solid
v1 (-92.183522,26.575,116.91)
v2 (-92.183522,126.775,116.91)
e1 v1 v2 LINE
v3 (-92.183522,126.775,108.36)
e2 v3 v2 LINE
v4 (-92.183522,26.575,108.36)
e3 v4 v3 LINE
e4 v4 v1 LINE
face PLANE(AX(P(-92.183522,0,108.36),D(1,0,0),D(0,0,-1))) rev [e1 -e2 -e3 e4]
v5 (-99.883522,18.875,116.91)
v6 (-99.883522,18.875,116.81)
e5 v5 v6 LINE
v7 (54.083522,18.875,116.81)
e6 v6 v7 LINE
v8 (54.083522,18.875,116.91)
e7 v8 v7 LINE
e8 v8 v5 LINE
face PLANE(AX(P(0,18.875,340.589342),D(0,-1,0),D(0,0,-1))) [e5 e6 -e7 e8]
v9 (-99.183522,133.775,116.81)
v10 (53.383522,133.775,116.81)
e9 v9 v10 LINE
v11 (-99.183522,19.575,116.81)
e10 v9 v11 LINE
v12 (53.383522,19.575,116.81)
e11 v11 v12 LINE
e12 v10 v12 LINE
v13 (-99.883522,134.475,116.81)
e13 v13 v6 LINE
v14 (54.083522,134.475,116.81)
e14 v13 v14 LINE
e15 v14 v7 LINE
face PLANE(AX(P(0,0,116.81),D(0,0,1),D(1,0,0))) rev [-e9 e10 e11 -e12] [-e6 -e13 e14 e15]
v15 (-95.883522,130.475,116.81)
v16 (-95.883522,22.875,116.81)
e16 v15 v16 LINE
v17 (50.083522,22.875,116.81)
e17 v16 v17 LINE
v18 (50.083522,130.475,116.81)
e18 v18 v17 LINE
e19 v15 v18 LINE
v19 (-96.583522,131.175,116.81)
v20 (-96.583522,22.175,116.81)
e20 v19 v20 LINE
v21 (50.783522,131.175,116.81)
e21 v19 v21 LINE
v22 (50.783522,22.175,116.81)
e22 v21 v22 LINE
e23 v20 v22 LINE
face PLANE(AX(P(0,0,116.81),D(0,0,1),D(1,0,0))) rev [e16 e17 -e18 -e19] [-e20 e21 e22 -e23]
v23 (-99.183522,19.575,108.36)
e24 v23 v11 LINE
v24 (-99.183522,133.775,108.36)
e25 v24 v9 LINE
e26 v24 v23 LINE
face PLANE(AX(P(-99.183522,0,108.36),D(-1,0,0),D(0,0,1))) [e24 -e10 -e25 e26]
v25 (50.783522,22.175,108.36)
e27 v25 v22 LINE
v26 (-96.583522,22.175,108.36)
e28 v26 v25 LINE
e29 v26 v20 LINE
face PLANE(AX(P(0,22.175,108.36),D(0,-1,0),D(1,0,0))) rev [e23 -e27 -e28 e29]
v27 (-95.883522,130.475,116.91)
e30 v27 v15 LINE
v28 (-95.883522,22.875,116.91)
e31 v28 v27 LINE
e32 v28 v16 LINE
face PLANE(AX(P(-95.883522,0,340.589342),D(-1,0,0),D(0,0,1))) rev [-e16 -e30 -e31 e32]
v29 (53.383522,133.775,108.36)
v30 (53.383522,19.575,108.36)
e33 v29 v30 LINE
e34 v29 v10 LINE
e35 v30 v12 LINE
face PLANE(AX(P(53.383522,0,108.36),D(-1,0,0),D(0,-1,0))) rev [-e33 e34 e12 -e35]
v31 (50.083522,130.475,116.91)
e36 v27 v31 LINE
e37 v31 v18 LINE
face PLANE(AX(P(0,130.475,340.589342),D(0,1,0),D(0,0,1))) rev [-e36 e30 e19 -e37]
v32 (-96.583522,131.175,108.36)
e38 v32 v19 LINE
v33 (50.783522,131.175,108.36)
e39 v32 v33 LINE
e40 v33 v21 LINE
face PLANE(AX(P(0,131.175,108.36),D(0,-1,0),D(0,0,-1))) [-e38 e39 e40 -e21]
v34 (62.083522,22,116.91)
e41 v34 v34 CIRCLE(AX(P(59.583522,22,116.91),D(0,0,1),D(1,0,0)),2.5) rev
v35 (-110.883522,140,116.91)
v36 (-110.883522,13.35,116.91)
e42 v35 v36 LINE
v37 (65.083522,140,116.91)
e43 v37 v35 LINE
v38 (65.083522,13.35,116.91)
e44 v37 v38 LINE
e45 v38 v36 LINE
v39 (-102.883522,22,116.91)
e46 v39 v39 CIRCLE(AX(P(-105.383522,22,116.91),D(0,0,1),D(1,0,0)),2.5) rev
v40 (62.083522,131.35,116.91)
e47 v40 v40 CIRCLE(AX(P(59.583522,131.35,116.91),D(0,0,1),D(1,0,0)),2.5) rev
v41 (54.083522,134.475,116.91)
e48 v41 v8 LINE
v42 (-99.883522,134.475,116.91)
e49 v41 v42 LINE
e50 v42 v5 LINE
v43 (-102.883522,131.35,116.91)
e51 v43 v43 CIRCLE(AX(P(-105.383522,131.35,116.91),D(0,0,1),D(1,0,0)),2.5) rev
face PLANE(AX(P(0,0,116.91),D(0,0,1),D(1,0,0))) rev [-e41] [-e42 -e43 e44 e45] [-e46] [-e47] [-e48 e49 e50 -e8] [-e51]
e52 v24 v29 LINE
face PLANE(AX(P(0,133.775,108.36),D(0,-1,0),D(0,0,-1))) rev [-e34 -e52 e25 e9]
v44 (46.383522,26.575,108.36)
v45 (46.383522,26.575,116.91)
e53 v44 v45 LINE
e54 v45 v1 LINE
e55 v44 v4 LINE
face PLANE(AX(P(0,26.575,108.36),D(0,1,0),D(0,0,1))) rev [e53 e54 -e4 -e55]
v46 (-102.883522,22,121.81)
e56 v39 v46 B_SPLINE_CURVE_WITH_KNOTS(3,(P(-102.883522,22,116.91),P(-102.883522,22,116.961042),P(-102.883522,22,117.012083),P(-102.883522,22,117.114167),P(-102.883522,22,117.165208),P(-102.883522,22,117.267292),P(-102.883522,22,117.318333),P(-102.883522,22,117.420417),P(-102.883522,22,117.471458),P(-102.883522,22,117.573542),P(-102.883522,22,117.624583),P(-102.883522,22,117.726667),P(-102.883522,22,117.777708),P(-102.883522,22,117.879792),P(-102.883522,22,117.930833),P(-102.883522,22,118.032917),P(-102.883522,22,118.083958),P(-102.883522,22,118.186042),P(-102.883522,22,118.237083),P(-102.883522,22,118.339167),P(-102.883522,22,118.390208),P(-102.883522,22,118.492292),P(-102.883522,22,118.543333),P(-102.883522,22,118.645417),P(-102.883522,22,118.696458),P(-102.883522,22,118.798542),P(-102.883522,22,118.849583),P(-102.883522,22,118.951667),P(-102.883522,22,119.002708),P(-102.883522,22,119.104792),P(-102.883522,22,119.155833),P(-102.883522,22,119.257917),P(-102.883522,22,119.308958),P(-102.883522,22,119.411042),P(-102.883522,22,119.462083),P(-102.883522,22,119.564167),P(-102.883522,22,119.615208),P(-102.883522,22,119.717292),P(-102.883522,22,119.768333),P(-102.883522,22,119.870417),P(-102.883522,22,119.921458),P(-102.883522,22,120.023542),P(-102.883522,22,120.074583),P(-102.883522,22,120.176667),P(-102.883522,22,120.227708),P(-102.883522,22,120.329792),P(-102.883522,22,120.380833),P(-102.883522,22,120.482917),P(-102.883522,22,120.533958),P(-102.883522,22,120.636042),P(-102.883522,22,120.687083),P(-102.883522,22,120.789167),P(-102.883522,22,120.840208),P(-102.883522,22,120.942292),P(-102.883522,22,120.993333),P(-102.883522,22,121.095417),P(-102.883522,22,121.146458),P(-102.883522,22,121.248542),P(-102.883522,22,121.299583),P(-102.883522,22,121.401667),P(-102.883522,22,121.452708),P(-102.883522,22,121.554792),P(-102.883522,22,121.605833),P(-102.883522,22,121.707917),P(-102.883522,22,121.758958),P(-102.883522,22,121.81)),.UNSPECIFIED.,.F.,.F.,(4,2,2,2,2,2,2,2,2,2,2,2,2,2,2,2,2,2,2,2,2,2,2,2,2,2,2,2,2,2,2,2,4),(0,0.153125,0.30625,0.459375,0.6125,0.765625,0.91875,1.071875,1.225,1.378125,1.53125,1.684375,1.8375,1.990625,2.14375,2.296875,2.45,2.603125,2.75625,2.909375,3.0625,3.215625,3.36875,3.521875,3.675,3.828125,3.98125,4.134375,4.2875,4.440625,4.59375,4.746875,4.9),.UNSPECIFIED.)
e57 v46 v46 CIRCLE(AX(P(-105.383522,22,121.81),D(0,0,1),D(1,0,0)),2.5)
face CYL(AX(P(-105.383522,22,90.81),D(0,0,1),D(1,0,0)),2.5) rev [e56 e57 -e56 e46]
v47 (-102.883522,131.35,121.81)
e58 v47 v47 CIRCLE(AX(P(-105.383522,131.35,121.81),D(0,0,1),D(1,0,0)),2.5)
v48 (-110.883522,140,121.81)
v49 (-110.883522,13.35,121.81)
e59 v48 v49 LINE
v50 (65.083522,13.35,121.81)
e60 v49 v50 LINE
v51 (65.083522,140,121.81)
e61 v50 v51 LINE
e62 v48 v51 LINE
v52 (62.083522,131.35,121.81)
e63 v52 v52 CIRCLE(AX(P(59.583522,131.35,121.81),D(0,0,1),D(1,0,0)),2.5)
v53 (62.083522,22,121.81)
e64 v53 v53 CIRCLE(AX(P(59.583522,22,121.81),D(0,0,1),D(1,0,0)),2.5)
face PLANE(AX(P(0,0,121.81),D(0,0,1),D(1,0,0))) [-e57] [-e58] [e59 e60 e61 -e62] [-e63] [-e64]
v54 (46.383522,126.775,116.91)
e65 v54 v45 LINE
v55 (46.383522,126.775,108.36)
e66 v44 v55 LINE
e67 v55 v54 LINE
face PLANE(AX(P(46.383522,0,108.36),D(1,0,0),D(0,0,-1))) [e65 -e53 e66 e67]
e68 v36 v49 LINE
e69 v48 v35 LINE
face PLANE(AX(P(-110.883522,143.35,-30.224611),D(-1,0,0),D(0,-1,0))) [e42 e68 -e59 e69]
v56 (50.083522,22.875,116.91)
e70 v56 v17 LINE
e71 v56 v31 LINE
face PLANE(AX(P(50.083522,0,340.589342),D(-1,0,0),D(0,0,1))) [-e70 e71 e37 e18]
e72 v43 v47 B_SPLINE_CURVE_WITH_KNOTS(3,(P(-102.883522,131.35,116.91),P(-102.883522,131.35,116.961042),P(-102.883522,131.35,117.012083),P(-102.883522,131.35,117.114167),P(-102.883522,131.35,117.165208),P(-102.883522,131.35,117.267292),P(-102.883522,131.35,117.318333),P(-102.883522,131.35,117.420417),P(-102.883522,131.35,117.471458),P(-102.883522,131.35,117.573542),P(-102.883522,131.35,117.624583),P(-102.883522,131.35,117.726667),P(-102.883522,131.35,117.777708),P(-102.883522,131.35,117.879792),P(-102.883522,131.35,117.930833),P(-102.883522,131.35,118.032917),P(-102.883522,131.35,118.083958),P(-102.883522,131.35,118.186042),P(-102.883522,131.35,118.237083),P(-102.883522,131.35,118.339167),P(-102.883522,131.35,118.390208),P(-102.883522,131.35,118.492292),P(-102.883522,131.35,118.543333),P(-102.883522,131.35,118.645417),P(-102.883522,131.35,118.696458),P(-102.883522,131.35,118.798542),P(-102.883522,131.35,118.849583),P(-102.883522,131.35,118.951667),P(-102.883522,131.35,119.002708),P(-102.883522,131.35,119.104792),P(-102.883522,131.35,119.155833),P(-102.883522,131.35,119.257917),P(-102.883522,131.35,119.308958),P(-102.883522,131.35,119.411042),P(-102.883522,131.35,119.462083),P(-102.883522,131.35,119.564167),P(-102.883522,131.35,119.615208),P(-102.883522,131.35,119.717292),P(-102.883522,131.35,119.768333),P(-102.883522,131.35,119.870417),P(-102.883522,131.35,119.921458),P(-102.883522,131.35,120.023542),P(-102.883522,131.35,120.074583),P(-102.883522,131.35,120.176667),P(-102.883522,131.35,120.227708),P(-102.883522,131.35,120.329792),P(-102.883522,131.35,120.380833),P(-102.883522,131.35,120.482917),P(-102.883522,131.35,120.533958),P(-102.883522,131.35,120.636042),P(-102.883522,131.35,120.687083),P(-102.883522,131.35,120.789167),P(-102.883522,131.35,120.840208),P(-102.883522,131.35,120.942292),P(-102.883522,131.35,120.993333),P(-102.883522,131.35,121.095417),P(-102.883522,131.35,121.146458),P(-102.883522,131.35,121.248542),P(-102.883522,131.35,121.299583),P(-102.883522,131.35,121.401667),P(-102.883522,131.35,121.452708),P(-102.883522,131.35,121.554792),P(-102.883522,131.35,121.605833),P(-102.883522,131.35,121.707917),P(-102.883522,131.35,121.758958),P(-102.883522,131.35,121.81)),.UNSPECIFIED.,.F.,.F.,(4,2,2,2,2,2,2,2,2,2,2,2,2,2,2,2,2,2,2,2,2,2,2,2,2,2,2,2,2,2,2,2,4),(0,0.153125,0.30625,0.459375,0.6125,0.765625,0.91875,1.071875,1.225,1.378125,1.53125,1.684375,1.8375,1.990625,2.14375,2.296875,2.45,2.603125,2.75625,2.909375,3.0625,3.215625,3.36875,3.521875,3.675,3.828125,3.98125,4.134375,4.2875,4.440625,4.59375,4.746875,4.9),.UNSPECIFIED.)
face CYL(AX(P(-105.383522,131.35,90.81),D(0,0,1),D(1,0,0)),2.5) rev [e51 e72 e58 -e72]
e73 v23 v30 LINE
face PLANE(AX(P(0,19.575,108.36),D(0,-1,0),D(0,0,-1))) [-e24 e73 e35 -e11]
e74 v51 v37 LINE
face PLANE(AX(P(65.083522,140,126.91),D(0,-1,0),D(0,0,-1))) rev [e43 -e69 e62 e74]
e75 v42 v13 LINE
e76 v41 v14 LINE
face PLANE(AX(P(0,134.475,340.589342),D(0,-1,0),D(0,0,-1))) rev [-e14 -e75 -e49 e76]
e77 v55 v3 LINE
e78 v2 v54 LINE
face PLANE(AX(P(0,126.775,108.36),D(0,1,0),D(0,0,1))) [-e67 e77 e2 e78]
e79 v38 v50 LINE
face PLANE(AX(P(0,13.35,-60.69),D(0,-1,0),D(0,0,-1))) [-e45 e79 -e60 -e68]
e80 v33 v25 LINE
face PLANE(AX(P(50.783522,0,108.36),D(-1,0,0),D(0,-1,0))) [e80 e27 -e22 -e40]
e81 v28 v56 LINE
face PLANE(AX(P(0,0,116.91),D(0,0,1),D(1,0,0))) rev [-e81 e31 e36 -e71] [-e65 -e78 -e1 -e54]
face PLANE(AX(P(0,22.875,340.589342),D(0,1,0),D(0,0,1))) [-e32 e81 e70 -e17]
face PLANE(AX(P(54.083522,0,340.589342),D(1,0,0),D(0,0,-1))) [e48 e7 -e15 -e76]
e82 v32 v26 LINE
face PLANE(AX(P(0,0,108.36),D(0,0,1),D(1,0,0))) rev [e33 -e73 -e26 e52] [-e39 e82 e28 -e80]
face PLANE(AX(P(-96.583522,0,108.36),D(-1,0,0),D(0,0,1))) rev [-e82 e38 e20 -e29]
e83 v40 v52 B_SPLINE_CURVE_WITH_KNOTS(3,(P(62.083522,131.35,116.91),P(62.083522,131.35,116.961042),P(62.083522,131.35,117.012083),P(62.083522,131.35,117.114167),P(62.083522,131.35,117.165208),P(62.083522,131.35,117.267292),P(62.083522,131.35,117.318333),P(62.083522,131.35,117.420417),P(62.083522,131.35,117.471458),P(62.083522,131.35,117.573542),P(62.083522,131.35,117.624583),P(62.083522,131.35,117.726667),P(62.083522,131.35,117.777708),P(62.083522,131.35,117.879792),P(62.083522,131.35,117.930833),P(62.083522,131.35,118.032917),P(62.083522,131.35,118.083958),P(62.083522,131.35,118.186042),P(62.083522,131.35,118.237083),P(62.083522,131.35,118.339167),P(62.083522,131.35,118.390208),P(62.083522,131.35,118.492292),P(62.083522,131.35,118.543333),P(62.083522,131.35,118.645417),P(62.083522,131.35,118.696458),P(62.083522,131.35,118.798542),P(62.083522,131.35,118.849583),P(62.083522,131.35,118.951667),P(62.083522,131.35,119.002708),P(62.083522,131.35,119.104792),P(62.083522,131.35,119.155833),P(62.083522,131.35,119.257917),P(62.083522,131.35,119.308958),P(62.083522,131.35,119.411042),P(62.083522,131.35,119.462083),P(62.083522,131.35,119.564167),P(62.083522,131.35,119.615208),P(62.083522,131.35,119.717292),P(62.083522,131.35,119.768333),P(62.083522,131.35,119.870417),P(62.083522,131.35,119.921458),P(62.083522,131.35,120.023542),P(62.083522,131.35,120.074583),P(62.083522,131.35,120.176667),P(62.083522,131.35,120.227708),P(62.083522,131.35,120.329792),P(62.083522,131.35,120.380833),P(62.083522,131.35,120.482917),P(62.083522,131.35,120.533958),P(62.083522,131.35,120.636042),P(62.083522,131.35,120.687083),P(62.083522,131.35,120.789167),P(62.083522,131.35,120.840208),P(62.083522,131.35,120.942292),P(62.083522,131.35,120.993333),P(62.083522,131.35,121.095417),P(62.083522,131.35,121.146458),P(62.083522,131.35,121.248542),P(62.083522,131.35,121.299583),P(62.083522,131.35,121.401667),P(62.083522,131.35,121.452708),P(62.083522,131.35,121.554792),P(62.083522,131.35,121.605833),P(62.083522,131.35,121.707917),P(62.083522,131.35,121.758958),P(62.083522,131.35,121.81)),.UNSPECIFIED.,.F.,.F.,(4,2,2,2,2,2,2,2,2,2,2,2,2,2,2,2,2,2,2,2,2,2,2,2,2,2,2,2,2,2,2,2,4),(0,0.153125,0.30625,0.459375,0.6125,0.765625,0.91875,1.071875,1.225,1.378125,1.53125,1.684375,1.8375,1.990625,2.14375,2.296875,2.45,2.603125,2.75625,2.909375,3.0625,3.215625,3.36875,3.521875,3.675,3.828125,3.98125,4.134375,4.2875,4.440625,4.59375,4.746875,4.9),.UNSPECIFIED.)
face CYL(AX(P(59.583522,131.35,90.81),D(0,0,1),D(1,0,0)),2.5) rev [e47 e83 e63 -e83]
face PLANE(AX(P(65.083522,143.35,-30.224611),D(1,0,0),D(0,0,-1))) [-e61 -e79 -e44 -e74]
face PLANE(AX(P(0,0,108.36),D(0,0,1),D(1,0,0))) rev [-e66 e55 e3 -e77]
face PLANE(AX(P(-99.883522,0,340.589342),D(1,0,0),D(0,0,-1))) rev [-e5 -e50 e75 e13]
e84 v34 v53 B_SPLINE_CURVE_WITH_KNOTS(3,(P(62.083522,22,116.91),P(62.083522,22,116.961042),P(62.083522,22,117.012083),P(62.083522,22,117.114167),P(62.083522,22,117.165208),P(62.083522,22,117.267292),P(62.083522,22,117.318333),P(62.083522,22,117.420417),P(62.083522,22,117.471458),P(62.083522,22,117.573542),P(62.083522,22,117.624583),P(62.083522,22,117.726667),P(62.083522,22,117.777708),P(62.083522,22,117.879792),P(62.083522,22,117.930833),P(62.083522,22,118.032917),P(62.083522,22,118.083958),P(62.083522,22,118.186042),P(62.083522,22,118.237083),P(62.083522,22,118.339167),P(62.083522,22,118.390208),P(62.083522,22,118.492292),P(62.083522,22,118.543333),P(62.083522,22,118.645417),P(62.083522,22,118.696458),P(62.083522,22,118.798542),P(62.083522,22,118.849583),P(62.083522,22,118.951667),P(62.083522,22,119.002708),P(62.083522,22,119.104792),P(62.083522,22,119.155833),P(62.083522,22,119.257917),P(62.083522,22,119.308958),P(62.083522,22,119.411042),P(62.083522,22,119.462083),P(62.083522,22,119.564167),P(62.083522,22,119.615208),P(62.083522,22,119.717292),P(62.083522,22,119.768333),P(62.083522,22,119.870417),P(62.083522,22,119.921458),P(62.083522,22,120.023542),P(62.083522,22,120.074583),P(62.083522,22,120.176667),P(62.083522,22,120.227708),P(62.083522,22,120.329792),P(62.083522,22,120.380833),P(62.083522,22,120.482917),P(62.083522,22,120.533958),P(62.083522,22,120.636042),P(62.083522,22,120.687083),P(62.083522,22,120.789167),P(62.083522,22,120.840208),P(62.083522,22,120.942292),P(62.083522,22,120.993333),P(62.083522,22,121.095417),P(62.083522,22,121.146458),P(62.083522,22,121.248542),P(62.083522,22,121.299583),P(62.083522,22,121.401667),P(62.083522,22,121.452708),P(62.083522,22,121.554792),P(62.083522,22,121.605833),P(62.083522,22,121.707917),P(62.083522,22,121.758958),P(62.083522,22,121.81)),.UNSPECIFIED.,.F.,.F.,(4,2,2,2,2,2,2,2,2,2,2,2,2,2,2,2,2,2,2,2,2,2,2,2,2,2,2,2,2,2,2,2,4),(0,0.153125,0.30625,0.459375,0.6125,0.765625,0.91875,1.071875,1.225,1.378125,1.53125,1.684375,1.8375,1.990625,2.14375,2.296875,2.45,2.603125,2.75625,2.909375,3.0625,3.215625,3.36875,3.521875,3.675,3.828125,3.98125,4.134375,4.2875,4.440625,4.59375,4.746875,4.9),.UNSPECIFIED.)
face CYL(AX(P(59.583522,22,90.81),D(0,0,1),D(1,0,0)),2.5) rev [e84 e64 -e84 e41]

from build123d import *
from OCP.BRepFilletAPI import BRepFilletAPI_MakeChamfer

# Parameters (mm, degrees)
SKETCH1_R               = 172.5
BOSS_EXTRUDE1_DEPTH     = 10
SKETCH2_R               = 48.41
CUT_EXTRUDE1_DEPTH      = 10
BOSS_EXTRUDE2_DEPTH     = 5
CUT_EXTRUDE2_DEPTH      = 497
CUT_EXTRUDE6_START      = -497
CUT_EXTRUDE6_DEPTH      = 497
SKETCH6_W               = 195.767044214
SKETCH6_H               = 55
SKETCH6_W_2             = 185.767044214
SKETCH6_H_2             = 45
BOSS_EXTRUDE3_DEPTH     = 133.35
SKETCH7_W               = 185.767044214
SKETCH7_H               = 45
BOSS_EXTRUDE4_DEPTH     = 5
BOSS_EXTRUDE5_DEPTH     = 8
CHAMFER1_SIZE           = 8
CHAMFER1_SIZE2          = 6.250285012
CHAMFER1_PART_2_SIZE    = 8
CHAMFER1_PART_2_SIZE2   = 6.250285012
CHAMFER1_PART_3_SIZE    = 8
CHAMFER1_PART_3_SIZE2   = 6.250285012
FILLET1_R               = 38
SKETCH9_R               = 374.079334695
CUT_EXTRUDE7_DEPTH      = 93
CUT_EXTRUDE8_DEPTH      = 93
CUT_EXTRUDE8_DEPTH_BACK = 93
SKETCH10_R              = 229.38613092
SKETCH10_R_2            = 152.4
SKETCH11_W              = 291.443368419
SKETCH11_H              = 134.798764099
SKETCH11_W_2            = 144.967044214
SKETCH11_H_2            = 55
CUT_EXTRUDE9_DEPTH      = 143
SKETCH12_W              = 5
SKETCH12_H              = 55
BOSS_EXTRUDE6_DEPTH     = 133.35
SKETCH13_R              = 10
CUT_EXTRUDE10_DEPTH     = 58
SKETCH14_W              = 139.967044214
SKETCH14_H              = 45
BOSS_EXTRUDE7_DEPTH     = 5
SKETCH15_W              = 139.967044214
SKETCH15_H              = 123.35
CUT_EXTRUDE11_DEPTH     = 13
SKETCH16_W              = 10
SKETCH16_H              = 133.35
SKETCH16_W_2            = 149.967044214
BOSS_EXTRUDE9_DEPTH     = 17
SKETCH17_W              = 153.967044214
SKETCH17_H              = 115.6
SKETCH17_W_2            = 145.967044214
SKETCH17_H_2            = 107.6
CUT_EXTRUDE12_DEPTH     = 10
CHAMFER2_SIZE           = 10
CHAMFER2_SIZE2          = 5.773502692
SKETCH24_R              = 15
CUT_EXTRUDE16_DEPTH     = 177.5
SKETCH20_W              = 169.967044214
SKETCH20_H              = 3.35
CUT_EXTRUDE17_DEPTH     = 177.5
SKETCH25_W              = 139.967044214
SKETCH25_H              = 38.773502692
BOSS_EXTRUDE11_DEPTH    = 5
SKETCH26_W              = 3
SKETCH26_H              = 130
BOSS_EXTRUDE12_DEPTH    = 17
SKETCH18_R              = 2.5
CUT_EXTRUDE19_DEPTH     = 26
SKETCH27_W              = 152.567044214
SKETCH27_H              = 114.2
SKETCH27_W_2            = 147.367044214
SKETCH27_H_2            = 109
BOSS_EXTRUDE13_DEPTH    = 8.45
SKETCH27_W_3            = 138.567044214
SKETCH27_H_3            = 100.2
BOSS_EXTRUDE13_2_DEPTH  = 8.45
BOSS_EXTRUDE14_START    = 5
SKETCH28_W              = 175.967044214
SKETCH28_H              = 130
SKETCH28_R              = 2.5
BOSS_EXTRUDE14_DEPTH    = 5
SKETCH29_W              = 292.528596907
SKETCH29_H              = 171.315367969
CUT_EXTRUDE20_DEPTH     = 46.55
SKETCH30_W              = 175.967044214
SKETCH30_H              = 130
SKETCH30_W_2            = 153.967044214
SKETCH30_H_2            = 115.6
SKETCH30_W_3            = 145.967044214
SKETCH30_H_3            = 107.6
SKETCH30_W_4            = 138.567044214
SKETCH30_H_4            = 100.2
CUT_EXTRUDE23_DEPTH     = 8.55
SKETCH31_W              = 175.967044214
SKETCH31_H              = 17.196232217
CUT_EXTRUDE24_DEPTH     = 10


with BuildPart() as part:
    # Sketch1 → Boss-Extrude1 (new body)
    with BuildSketch(Plane(origin=(0, 0, 0), x_dir=(1, 0, 0), z_dir=(0, 1, 0))):
        with Locations(Location((0, 0, 0), (0, 0, 270))):
            Circle(SKETCH1_R)
    extrude(amount=BOSS_EXTRUDE1_DEPTH)

    # Sketch2 → Cut-Extrude1 (cut)
    with BuildSketch(Plane(origin=(0, 10, 0), x_dir=(1, 0, 0), z_dir=(0, 1, 0))):
        with Locations((-75.91, -178.72)):
            Circle(SKETCH2_R)
        with Locations((75.91, -178.72)):
            Circle(SKETCH2_R)
    extrude(amount=-CUT_EXTRUDE1_DEPTH, mode=Mode.SUBTRACT)

    # Sketch3 → Boss-Extrude2 (add)
    with BuildSketch(Plane(origin=(0, 10, 0), x_dir=(1, 0, 0), z_dir=(0, 1, 0))):
        with BuildLine():
            Line((-98.968297449, -119.81), (98.968297449, -119.81))
            ThreePointArc((98.968297449, -119.81), (0, 155.4), (-98.968297449, -119.81))
        make_face()
        with BuildLine():
            ThreePointArc((97.883522107, -116.81), (0, 152.4), (-97.883522107, -116.81))
            Line((-97.883522107, -116.81), (97.883522107, -116.81))
        make_face(mode=Mode.SUBTRACT)
    extrude(amount=BOSS_EXTRUDE2_DEPTH)

    # Sketch4 → Cut-Extrude2 (cut)
    with BuildSketch(Plane(origin=(0, 10, 0), x_dir=(1, 0, 0), z_dir=(0, 1, 0))):
        Polygon((-28.261160255, -170.169200565), (28.261160255, -170.169200565), (28.261160255, -183.836149753), (-30.300470404, -183.836149753), align=None)
    extrude(amount=-CUT_EXTRUDE2_DEPTH, mode=Mode.SUBTRACT)

    # Sketch5 → Cut-Extrude6 (cut)
    with BuildSketch(Plane(origin=(0, 10, 0), x_dir=(1, 0, 0), z_dir=(0, 1, 0)).offset(CUT_EXTRUDE6_START)):
        with BuildLine():
            ThreePointArc((26.702080818, 170.420799435), (0, 172.5), (-26.702080818, 170.420799435))
            Line((-26.702080818, 170.420799435), (26.702080818, 170.420799435))
        make_face()
        with BuildLine():
            ThreePointArc((166.525, -45.007492432), (172.5, 0), (166.525, 45.007492432))
            Line((166.525, 45.007492432), (166.525, -45.007492432))
        make_face()
        with BuildLine():
            Line((-166.525, -45.007492432), (-166.525, 45.007492432))
            ThreePointArc((-166.525, 45.007492432), (-172.5, 0), (-166.525, -45.007492432))
        make_face()
    extrude(amount=CUT_EXTRUDE6_DEPTH, mode=Mode.SUBTRACT)

    # Sketch6 → Boss-Extrude3 (add)
    with BuildSketch(Plane(origin=(0, 10, 0), x_dir=(1, 0, 0), z_dir=(0, 1, 0))):
        with Locations((0, -89.31)):
            Rectangle(SKETCH6_W, SKETCH6_H)
        with Locations((0, -89.31)):
            Rectangle(SKETCH6_W_2, SKETCH6_H_2, mode=Mode.SUBTRACT)
    extrude(amount=BOSS_EXTRUDE3_DEPTH)

    # Sketch7 → Boss-Extrude4 (add)
    with BuildSketch(Plane(origin=(0, 10, 0), x_dir=(1, 0, 0), z_dir=(0, 1, 0))):
        with Locations((0, -89.31)):
            Rectangle(SKETCH7_W, SKETCH7_H)
    extrude(amount=BOSS_EXTRUDE4_DEPTH)

    # Sketch8 → Boss-Extrude5 (add)
    with BuildSketch(Plane(origin=(0, 10, 0), x_dir=(1, 0, 0), z_dir=(0, 1, 0))):
        with BuildLine():
            Line((-97.883522107, -61.81), (-112.883522107, -61.81))
            Line((-112.883522107, -61.81), (-112.883522107, -101.267136509))
            ThreePointArc((-112.883522107, -101.267136509), (-105.634768892, -108.807252061), (-97.883522107, -115.829782871))
            Line((-97.883522107, -115.829782871), (-97.883522107, -61.81))
        make_face()
        with BuildLine():
            Line((-88.028513968, -46.81), (-88.028513968, -61.81))
            Line((-88.028513968, -61.81), (97.883522107, -61.81))
            Line((97.883522107, -61.81), (97.883522107, -115.829782871))
            ThreePointArc((97.883522107, -115.829782871), (105.634768892, -108.807252061), (112.883522107, -101.267136509))
            Line((112.883522107, -101.267136509), (112.883522107, -46.81))
            Line((112.883522107, -46.81), (-88.028513968, -46.81))
        make_face()
    extrude(amount=BOSS_EXTRUDE5_DEPTH)

    # Chamfer1
    chamfer1_edges = [part.edges().sort_by_distance(p)[0] for p in [
        (-97.883522107, 18, 88.819891436),
    ]]
    chamfer1_side = [part.faces().sort_by_distance(p)[0] for p in [
        (-97.883522107, 80.599247918, 89.340686997),
    ]]
    chamfer(chamfer1_edges, length=CHAMFER1_SIZE, length2=CHAMFER1_SIZE2, reference=chamfer1_side[0])

    # Chamfer1 part 2
    chamfer1_part_2_edges = [part.edges().sort_by_distance(p)[0] for p in [
        (4.927504069, 18, 61.81),
    ]]
    chamfer1_part_2_side = [part.faces().sort_by_distance(p)[0] for p in [
        (-0.807441513, 80.139082253, 61.81),
    ]]
    chamfer(chamfer1_part_2_edges, length=CHAMFER1_PART_2_SIZE, length2=CHAMFER1_PART_2_SIZE2, reference=chamfer1_part_2_side[0])

    # Chamfer1 part 3
    chamfer1_part_3_edges = [part.edges().sort_by_distance(p)[0] for p in [
        (97.883522107, 18, 88.819891436),
    ]]
    chamfer1_part_3_side = [part.faces().sort_by_distance(p)[0] for p in [
        (97.883522107, 80.599247918, 89.340686997),
    ]]
    chamfer(chamfer1_part_3_edges, length=CHAMFER1_PART_3_SIZE, length2=CHAMFER1_PART_3_SIZE2, reference=chamfer1_part_3_side[0])

    # Fillet1
    # the kernel refuses this fillet: 38 mm, written as the material it adds along each edge
    with BuildSketch(Plane(origin=(-97.883522107, 26, 148.028657271), x_dir=(-0.61566147532566, -0.7880107536067207, 0), z_dir=(0, 0, -1))) as fillet1_piece_1_section:
        with BuildLine():
            CenterArc((13.24591235, 37.873851244), FILLET1_R, 232, 33.330100487)
            Line((-10.149223713, 7.929442607), (0, 0))
            Line((0, 0), (10.152145721, 0))
        make_face()
    fillet1_piece_1 = extrude(amount=86.218657271, mode=Mode.PRIVATE)
    fillet1_piece_1 = fillet1_piece_1 & Plane(origin=(0, 26, 0), x_dir=(-0.7443687577094257, 0, 0.6677687867414337), z_dir=(0, -1, 0)) * Cylinder(151.65, 214, mode=Mode.PRIVATE)
    add(fillet1_piece_1)
    with BuildSketch(Plane(origin=(-88.028513968, 26, 61.81), x_dir=(0, 1, 0), z_dir=(1, 0, 0))) as fillet1_piece_2_section:
        with BuildLine():
            CenterArc((12.87954976, -38), FILLET1_R, 90, 33.330100487)
            Line((-8, -6.250285012), (0, 0))
            Line((0, 0), (12.87954976, 0))
        make_face()
    fillet1_piece_2 = extrude(amount=218.110910475, mode=Mode.PRIVATE)
    fillet1_piece_2 = fillet1_piece_2 - Plane(origin=(135.883522107, 38.87954976, 61.81), x_dir=(-0.8355188154722692, -0.5494618357919104, 0), z_dir=(0, 0, -1)) * Cylinder(38, 488, mode=Mode.PRIVATE)
    add(fillet1_piece_2)
    with BuildSketch(Plane(origin=(97.883522107, 26, 29.6111256), x_dir=(0.61566147532566, -0.7880107536067207, 0), z_dir=(0, 0, 1))) as fillet1_piece_3_section:
        with BuildLine():
            CenterArc((13.24591235, 37.873851244), FILLET1_R, 232, 33.330100487)
            Line((-10.149223713, 7.929442607), (0, 0))
            Line((0, 0), (10.152145721, 0))
        make_face()
    fillet1_piece_3 = extrude(amount=118.417531672, mode=Mode.PRIVATE)
    fillet1_piece_3 = fillet1_piece_3 & Plane(origin=(0, 26, 0), x_dir=(0.6454567893612635, 0, 0.7637967878090673), z_dir=(0, -1, 0)) * Cylinder(151.65, 278, mode=Mode.PRIVATE)
    fillet1_piece_3 = fillet1_piece_3 - Plane(origin=(97.883522107, 38.87954976, 23.81), x_dir=(0, 0, 1), z_dir=(-1, 0, 0)) * Cylinder(38, 278, mode=Mode.PRIVATE)
    add(fillet1_piece_3)

    # Sketch9 → Cut-Extrude7 (cut)
    with BuildSketch(Plane(origin=(0, 10, 0), x_dir=(1, 0, 0), z_dir=(0, 1, 0))):
        Circle(SKETCH9_R)
    extrude(amount=-CUT_EXTRUDE7_DEPTH, mode=Mode.SUBTRACT)

    # Sketch10 → Cut-Extrude8 (cut, two sides: drawn at the far end of the back side and taken through both)
    with BuildSketch(Plane.XZ.offset(-10).offset(-CUT_EXTRUDE8_DEPTH_BACK)):
        Circle(SKETCH10_R)
        Circle(SKETCH10_R_2, mode=Mode.SUBTRACT)
    extrude(amount=CUT_EXTRUDE8_DEPTH + CUT_EXTRUDE8_DEPTH_BACK, mode=Mode.SUBTRACT)

    # Sketch11 → Cut-Extrude9 (cut)
    with BuildSketch(Plane(origin=(0, 143.35, 0), x_dir=(1, 0, 0), z_dir=(0, 1, 0))):
        with Locations((4.840839595, -88.771460056)):
            Rectangle(SKETCH11_W, SKETCH11_H)
        with Locations((-25.4, -89.31)):
            Rectangle(SKETCH11_W_2, SKETCH11_H_2, mode=Mode.SUBTRACT)
    extrude(amount=-CUT_EXTRUDE9_DEPTH, mode=Mode.SUBTRACT)

    # Sketch12 → Boss-Extrude6 (add)
    with BuildSketch(Plane(origin=(0, 143.35, 0), x_dir=(1, 0, 0), z_dir=(0, 1, 0))):
        with Locations((49.583522107, -89.31)):
            Rectangle(SKETCH12_W, SKETCH12_H)
    extrude(amount=-BOSS_EXTRUDE6_DEPTH)

    # Sketch13 → Cut-Extrude10 (cut)
    with BuildSketch(Plane.ZY.offset(97.883522107)):
        with Locations((89.418847681, 75)):
            Circle(SKETCH13_R)
    extrude(amount=-CUT_EXTRUDE10_DEPTH, mode=Mode.SUBTRACT)

    # Sketch14 → Boss-Extrude7 (add)
    with BuildSketch(Plane(origin=(0, 143.35, 0), x_dir=(1, 0, 0), z_dir=(0, 1, 0))):
        with Locations((-22.9, -89.31)):
            Rectangle(SKETCH14_W, SKETCH14_H)
    extrude(amount=-BOSS_EXTRUDE7_DEPTH)

    # Sketch15 → Cut-Extrude11 (cut)
    with BuildSketch(Plane.XY.offset(116.81)):
        with Locations((-22.9, 76.675)):
            Rectangle(SKETCH15_W, SKETCH15_H)
    extrude(amount=-CUT_EXTRUDE11_DEPTH, mode=Mode.SUBTRACT)

    # Sketch16 → Boss-Extrude9 (add)
    # profile 1 of 5: a face of its own
    with BuildSketch(Plane.XY.offset(116.81)):
        with Locations((-102.883522107, 76.675)):
            Rectangle(SKETCH16_W, SKETCH16_H)
    # profile 2 of 5: a face of its own
    with BuildSketch(Plane.XY.offset(116.81)):
        with Locations((-22.9, 76.675)):
            Rectangle(SKETCH16_W_2, SKETCH16_H)
        Polygon((-92.883522107, 127.475), (-92.883522107, 138.35), (47.083522107, 138.35), (47.083522107, 127.475), (47.083522107, 76.675), (47.083522107, 25.875), (47.083522107, 15), (-92.883522107, 15), (-92.883522107, 25.875), (-92.883522107, 76.675), align=None, mode=Mode.SUBTRACT)
    # profile 3 of 5: a face of its own
    with BuildSketch(Plane.XY.offset(116.81)):
        with Locations((57.083522107, 76.675)):
            Rectangle(SKETCH16_W, SKETCH16_H)
    # profile 4 of 5: a face of its own
    with BuildSketch(Plane.XY.offset(116.81)):
        Polygon((47.083522107, 138.35), (-92.883522107, 138.35), (-92.883522107, 127.475), (-22.9, 127.475), (47.083522107, 127.475), align=None)
    # profile 5 of 5: a face of its own
    with BuildSketch(Plane.XY.offset(116.81)):
        Polygon((-22.9, 25.875), (-92.883522107, 25.875), (-92.883522107, 15), (47.083522107, 15), (47.083522107, 25.875), align=None)
    extrude(amount=-BOSS_EXTRUDE9_DEPTH)

    # Sketch17 → Cut-Extrude12 (cut)
    with BuildSketch(Plane.XY.offset(116.81)):
        with Locations((-22.9, 76.675)):
            Rectangle(SKETCH17_W, SKETCH17_H)
        with Locations((-22.9, 76.675)):
            Rectangle(SKETCH17_W_2, SKETCH17_H_2, mode=Mode.SUBTRACT)
    extrude(amount=-CUT_EXTRUDE12_DEPTH, mode=Mode.SUBTRACT)

    # Chamfer2: one chamfer whose edges measure the first distance from different faces: ONE call of the kernel's chamfer builder (chamfer() names one face for all edges)
    chamfer2_edges_1 = [part.edges().sort_by_distance(p)[0] for p in [
        (-22.9, 25.875, 99.81),
    ]]
    chamfer2_side_1 = [part.faces().sort_by_distance(p)[0] for p in [
        (-22.9, 25.875, 108.31),
    ]]
    chamfer2_edges_2 = [part.edges().sort_by_distance(p)[0] for p in [
        (-22.9, 127.475, 99.81),
    ]]
    chamfer2_side_2 = [part.faces().sort_by_distance(p)[0] for p in [
        (-22.9, 132.9125, 99.81),
    ]]
    chamfer2 = BRepFilletAPI_MakeChamfer(part.part.solid().wrapped)
    for e in chamfer2_edges_1:
        chamfer2.Add(CHAMFER2_SIZE, CHAMFER2_SIZE2, e.wrapped, chamfer2_side_1[0].wrapped)  # the first distance lies on this face
    for e in chamfer2_edges_2:
        chamfer2.Add(CHAMFER2_SIZE, CHAMFER2_SIZE2, e.wrapped, chamfer2_side_2[0].wrapped)  # the first distance lies on this face
    add(Compound.cast(chamfer2.Shape()), mode=Mode.REPLACE)

    # Sketch24 → Cut-Extrude16 (cut)
    with BuildSketch(Plane.ZY.offset(97.883522107)):
        with Locations((83.81, 75)):
            Circle(SKETCH24_R)
    extrude(amount=-CUT_EXTRUDE16_DEPTH, mode=Mode.SUBTRACT)

    # Sketch20 → Cut-Extrude17 (cut)
    with BuildSketch(Plane.XY.offset(116.81)):
        with Locations((-22.9, 11.675)):
            Rectangle(SKETCH20_W, SKETCH20_H)
    extrude(amount=-CUT_EXTRUDE17_DEPTH, mode=Mode.SUBTRACT)

    # Sketch25 → Boss-Extrude11 (add)
    with BuildSketch(Plane(origin=(0, 13.35, 0), x_dir=(-1, 0, 0), z_dir=(0, -1, 0))):
        with Locations((22.9, -86.196751346)):
            Rectangle(SKETCH25_W, SKETCH25_H)
    extrude(amount=-BOSS_EXTRUDE11_DEPTH)

    # Sketch26 → Boss-Extrude12 (add)
    with BuildSketch(Plane.XY.offset(116.81)):
        with Locations((-109.383522107, 78.35)):
            Rectangle(SKETCH26_W, SKETCH26_H)
        with Locations((63.583522107, 78.35)):
            Rectangle(SKETCH26_W, SKETCH26_H)
    extrude(amount=-BOSS_EXTRUDE12_DEPTH)

    # Sketch18 → Cut-Extrude19 (cut)
    with BuildSketch(Plane.XY.offset(116.81)):
        with Locations((-105.383522107, 22)):
            Circle(SKETCH18_R)
        with Locations((59.583522107, 22)):
            Circle(SKETCH18_R)
        with Locations((59.583522107, 131.35)):
            Circle(SKETCH18_R)
        with Locations((-105.383522107, 131.35)):
            Circle(SKETCH18_R)
    extrude(amount=-CUT_EXTRUDE19_DEPTH, mode=Mode.SUBTRACT)



with BuildPart() as body_2:
    # Sketch27 → Boss-Extrude13 (new body)
    with BuildSketch(Plane.XY.offset(116.81)):
        with Locations((-22.9, 76.675)):
            Rectangle(SKETCH27_W, SKETCH27_H)
        with Locations((-22.9, 76.675)):
            Rectangle(SKETCH27_W_2, SKETCH27_H_2, mode=Mode.SUBTRACT)
    extrude(amount=-BOSS_EXTRUDE13_DEPTH)


with BuildPart() as body_3:
    # Sketch27 → Boss-Extrude13 2 (new body)
    with BuildSketch(Plane.XY.offset(116.81)):
        with Locations((-22.9, 76.675)):
            Rectangle(SKETCH27_W_3, SKETCH27_H_3)
    extrude(amount=-BOSS_EXTRUDE13_2_DEPTH)


with BuildPart() as part_1:
    add(part.part)

    add(body_2.part)  # Boss-Extrude14 merges body 2

    add(body_3.part)  # Boss-Extrude14 merges body 3
    # Sketch28 → Boss-Extrude14 (add)
    with BuildSketch(Plane.XY.offset(116.81).offset(BOSS_EXTRUDE14_START)):
        with Locations((-22.9, 78.35)):
            Rectangle(SKETCH28_W, SKETCH28_H)
        with Locations((-105.383522107, 131.35)):
            Circle(SKETCH28_R, mode=Mode.SUBTRACT)
        with Locations((59.583522107, 131.35)):
            Circle(SKETCH28_R, mode=Mode.SUBTRACT)
        with Locations((59.583522107, 22)):
            Circle(SKETCH28_R, mode=Mode.SUBTRACT)
        with Locations((-105.383522107, 22)):
            Circle(SKETCH28_R, mode=Mode.SUBTRACT)
    extrude(amount=-BOSS_EXTRUDE14_DEPTH)

    # Sketch29 → Cut-Extrude20 (cut)
    with BuildSketch(Plane(origin=(0, 0, 61.81), x_dir=(-1, 0, 0), z_dir=(0, 0, -1))):
        with Locations((7.671703237, 74.887303123)):
            Rectangle(SKETCH29_W, SKETCH29_H)
    extrude(amount=-CUT_EXTRUDE20_DEPTH, mode=Mode.SUBTRACT)

    # Sketch30 → Cut-Extrude23 (cut)
    # profile 1 of 2: a face of its own
    with BuildSketch(Plane(origin=(0, 0, 108.36), x_dir=(-1, 0, 0), z_dir=(0, 0, -1))):
        with Locations((22.9, 78.35)):
            Rectangle(SKETCH30_W, SKETCH30_H)
        with Locations((22.9, 76.675)):
            Rectangle(SKETCH30_W_2, SKETCH30_H_2, mode=Mode.SUBTRACT)
    # profile 2 of 2: a face of its own
    with BuildSketch(Plane(origin=(0, 0, 108.36), x_dir=(-1, 0, 0), z_dir=(0, 0, -1))):
        with Locations((22.9, 76.675)):
            Rectangle(SKETCH30_W_3, SKETCH30_H_3)
        with Locations((22.9, 76.675)):
            Rectangle(SKETCH30_W_4, SKETCH30_H_4, mode=Mode.SUBTRACT)
    extrude(amount=-CUT_EXTRUDE23_DEPTH, mode=Mode.SUBTRACT)

    # Sketch31 → Cut-Extrude24 (cut)
    with BuildSketch(Plane(origin=(0, 0, 116.91), x_dir=(-1, 0, 0), z_dir=(0, 0, -1))):
        with Locations((22.9, 4.751883892)):
            Rectangle(SKETCH31_W, SKETCH31_H)
        with Locations((22.9, 148.598116108)):
            Rectangle(SKETCH31_W, SKETCH31_H)
    extrude(amount=-CUT_EXTRUDE24_DEPTH, mode=Mode.SUBTRACT)


solid = part_1.part
